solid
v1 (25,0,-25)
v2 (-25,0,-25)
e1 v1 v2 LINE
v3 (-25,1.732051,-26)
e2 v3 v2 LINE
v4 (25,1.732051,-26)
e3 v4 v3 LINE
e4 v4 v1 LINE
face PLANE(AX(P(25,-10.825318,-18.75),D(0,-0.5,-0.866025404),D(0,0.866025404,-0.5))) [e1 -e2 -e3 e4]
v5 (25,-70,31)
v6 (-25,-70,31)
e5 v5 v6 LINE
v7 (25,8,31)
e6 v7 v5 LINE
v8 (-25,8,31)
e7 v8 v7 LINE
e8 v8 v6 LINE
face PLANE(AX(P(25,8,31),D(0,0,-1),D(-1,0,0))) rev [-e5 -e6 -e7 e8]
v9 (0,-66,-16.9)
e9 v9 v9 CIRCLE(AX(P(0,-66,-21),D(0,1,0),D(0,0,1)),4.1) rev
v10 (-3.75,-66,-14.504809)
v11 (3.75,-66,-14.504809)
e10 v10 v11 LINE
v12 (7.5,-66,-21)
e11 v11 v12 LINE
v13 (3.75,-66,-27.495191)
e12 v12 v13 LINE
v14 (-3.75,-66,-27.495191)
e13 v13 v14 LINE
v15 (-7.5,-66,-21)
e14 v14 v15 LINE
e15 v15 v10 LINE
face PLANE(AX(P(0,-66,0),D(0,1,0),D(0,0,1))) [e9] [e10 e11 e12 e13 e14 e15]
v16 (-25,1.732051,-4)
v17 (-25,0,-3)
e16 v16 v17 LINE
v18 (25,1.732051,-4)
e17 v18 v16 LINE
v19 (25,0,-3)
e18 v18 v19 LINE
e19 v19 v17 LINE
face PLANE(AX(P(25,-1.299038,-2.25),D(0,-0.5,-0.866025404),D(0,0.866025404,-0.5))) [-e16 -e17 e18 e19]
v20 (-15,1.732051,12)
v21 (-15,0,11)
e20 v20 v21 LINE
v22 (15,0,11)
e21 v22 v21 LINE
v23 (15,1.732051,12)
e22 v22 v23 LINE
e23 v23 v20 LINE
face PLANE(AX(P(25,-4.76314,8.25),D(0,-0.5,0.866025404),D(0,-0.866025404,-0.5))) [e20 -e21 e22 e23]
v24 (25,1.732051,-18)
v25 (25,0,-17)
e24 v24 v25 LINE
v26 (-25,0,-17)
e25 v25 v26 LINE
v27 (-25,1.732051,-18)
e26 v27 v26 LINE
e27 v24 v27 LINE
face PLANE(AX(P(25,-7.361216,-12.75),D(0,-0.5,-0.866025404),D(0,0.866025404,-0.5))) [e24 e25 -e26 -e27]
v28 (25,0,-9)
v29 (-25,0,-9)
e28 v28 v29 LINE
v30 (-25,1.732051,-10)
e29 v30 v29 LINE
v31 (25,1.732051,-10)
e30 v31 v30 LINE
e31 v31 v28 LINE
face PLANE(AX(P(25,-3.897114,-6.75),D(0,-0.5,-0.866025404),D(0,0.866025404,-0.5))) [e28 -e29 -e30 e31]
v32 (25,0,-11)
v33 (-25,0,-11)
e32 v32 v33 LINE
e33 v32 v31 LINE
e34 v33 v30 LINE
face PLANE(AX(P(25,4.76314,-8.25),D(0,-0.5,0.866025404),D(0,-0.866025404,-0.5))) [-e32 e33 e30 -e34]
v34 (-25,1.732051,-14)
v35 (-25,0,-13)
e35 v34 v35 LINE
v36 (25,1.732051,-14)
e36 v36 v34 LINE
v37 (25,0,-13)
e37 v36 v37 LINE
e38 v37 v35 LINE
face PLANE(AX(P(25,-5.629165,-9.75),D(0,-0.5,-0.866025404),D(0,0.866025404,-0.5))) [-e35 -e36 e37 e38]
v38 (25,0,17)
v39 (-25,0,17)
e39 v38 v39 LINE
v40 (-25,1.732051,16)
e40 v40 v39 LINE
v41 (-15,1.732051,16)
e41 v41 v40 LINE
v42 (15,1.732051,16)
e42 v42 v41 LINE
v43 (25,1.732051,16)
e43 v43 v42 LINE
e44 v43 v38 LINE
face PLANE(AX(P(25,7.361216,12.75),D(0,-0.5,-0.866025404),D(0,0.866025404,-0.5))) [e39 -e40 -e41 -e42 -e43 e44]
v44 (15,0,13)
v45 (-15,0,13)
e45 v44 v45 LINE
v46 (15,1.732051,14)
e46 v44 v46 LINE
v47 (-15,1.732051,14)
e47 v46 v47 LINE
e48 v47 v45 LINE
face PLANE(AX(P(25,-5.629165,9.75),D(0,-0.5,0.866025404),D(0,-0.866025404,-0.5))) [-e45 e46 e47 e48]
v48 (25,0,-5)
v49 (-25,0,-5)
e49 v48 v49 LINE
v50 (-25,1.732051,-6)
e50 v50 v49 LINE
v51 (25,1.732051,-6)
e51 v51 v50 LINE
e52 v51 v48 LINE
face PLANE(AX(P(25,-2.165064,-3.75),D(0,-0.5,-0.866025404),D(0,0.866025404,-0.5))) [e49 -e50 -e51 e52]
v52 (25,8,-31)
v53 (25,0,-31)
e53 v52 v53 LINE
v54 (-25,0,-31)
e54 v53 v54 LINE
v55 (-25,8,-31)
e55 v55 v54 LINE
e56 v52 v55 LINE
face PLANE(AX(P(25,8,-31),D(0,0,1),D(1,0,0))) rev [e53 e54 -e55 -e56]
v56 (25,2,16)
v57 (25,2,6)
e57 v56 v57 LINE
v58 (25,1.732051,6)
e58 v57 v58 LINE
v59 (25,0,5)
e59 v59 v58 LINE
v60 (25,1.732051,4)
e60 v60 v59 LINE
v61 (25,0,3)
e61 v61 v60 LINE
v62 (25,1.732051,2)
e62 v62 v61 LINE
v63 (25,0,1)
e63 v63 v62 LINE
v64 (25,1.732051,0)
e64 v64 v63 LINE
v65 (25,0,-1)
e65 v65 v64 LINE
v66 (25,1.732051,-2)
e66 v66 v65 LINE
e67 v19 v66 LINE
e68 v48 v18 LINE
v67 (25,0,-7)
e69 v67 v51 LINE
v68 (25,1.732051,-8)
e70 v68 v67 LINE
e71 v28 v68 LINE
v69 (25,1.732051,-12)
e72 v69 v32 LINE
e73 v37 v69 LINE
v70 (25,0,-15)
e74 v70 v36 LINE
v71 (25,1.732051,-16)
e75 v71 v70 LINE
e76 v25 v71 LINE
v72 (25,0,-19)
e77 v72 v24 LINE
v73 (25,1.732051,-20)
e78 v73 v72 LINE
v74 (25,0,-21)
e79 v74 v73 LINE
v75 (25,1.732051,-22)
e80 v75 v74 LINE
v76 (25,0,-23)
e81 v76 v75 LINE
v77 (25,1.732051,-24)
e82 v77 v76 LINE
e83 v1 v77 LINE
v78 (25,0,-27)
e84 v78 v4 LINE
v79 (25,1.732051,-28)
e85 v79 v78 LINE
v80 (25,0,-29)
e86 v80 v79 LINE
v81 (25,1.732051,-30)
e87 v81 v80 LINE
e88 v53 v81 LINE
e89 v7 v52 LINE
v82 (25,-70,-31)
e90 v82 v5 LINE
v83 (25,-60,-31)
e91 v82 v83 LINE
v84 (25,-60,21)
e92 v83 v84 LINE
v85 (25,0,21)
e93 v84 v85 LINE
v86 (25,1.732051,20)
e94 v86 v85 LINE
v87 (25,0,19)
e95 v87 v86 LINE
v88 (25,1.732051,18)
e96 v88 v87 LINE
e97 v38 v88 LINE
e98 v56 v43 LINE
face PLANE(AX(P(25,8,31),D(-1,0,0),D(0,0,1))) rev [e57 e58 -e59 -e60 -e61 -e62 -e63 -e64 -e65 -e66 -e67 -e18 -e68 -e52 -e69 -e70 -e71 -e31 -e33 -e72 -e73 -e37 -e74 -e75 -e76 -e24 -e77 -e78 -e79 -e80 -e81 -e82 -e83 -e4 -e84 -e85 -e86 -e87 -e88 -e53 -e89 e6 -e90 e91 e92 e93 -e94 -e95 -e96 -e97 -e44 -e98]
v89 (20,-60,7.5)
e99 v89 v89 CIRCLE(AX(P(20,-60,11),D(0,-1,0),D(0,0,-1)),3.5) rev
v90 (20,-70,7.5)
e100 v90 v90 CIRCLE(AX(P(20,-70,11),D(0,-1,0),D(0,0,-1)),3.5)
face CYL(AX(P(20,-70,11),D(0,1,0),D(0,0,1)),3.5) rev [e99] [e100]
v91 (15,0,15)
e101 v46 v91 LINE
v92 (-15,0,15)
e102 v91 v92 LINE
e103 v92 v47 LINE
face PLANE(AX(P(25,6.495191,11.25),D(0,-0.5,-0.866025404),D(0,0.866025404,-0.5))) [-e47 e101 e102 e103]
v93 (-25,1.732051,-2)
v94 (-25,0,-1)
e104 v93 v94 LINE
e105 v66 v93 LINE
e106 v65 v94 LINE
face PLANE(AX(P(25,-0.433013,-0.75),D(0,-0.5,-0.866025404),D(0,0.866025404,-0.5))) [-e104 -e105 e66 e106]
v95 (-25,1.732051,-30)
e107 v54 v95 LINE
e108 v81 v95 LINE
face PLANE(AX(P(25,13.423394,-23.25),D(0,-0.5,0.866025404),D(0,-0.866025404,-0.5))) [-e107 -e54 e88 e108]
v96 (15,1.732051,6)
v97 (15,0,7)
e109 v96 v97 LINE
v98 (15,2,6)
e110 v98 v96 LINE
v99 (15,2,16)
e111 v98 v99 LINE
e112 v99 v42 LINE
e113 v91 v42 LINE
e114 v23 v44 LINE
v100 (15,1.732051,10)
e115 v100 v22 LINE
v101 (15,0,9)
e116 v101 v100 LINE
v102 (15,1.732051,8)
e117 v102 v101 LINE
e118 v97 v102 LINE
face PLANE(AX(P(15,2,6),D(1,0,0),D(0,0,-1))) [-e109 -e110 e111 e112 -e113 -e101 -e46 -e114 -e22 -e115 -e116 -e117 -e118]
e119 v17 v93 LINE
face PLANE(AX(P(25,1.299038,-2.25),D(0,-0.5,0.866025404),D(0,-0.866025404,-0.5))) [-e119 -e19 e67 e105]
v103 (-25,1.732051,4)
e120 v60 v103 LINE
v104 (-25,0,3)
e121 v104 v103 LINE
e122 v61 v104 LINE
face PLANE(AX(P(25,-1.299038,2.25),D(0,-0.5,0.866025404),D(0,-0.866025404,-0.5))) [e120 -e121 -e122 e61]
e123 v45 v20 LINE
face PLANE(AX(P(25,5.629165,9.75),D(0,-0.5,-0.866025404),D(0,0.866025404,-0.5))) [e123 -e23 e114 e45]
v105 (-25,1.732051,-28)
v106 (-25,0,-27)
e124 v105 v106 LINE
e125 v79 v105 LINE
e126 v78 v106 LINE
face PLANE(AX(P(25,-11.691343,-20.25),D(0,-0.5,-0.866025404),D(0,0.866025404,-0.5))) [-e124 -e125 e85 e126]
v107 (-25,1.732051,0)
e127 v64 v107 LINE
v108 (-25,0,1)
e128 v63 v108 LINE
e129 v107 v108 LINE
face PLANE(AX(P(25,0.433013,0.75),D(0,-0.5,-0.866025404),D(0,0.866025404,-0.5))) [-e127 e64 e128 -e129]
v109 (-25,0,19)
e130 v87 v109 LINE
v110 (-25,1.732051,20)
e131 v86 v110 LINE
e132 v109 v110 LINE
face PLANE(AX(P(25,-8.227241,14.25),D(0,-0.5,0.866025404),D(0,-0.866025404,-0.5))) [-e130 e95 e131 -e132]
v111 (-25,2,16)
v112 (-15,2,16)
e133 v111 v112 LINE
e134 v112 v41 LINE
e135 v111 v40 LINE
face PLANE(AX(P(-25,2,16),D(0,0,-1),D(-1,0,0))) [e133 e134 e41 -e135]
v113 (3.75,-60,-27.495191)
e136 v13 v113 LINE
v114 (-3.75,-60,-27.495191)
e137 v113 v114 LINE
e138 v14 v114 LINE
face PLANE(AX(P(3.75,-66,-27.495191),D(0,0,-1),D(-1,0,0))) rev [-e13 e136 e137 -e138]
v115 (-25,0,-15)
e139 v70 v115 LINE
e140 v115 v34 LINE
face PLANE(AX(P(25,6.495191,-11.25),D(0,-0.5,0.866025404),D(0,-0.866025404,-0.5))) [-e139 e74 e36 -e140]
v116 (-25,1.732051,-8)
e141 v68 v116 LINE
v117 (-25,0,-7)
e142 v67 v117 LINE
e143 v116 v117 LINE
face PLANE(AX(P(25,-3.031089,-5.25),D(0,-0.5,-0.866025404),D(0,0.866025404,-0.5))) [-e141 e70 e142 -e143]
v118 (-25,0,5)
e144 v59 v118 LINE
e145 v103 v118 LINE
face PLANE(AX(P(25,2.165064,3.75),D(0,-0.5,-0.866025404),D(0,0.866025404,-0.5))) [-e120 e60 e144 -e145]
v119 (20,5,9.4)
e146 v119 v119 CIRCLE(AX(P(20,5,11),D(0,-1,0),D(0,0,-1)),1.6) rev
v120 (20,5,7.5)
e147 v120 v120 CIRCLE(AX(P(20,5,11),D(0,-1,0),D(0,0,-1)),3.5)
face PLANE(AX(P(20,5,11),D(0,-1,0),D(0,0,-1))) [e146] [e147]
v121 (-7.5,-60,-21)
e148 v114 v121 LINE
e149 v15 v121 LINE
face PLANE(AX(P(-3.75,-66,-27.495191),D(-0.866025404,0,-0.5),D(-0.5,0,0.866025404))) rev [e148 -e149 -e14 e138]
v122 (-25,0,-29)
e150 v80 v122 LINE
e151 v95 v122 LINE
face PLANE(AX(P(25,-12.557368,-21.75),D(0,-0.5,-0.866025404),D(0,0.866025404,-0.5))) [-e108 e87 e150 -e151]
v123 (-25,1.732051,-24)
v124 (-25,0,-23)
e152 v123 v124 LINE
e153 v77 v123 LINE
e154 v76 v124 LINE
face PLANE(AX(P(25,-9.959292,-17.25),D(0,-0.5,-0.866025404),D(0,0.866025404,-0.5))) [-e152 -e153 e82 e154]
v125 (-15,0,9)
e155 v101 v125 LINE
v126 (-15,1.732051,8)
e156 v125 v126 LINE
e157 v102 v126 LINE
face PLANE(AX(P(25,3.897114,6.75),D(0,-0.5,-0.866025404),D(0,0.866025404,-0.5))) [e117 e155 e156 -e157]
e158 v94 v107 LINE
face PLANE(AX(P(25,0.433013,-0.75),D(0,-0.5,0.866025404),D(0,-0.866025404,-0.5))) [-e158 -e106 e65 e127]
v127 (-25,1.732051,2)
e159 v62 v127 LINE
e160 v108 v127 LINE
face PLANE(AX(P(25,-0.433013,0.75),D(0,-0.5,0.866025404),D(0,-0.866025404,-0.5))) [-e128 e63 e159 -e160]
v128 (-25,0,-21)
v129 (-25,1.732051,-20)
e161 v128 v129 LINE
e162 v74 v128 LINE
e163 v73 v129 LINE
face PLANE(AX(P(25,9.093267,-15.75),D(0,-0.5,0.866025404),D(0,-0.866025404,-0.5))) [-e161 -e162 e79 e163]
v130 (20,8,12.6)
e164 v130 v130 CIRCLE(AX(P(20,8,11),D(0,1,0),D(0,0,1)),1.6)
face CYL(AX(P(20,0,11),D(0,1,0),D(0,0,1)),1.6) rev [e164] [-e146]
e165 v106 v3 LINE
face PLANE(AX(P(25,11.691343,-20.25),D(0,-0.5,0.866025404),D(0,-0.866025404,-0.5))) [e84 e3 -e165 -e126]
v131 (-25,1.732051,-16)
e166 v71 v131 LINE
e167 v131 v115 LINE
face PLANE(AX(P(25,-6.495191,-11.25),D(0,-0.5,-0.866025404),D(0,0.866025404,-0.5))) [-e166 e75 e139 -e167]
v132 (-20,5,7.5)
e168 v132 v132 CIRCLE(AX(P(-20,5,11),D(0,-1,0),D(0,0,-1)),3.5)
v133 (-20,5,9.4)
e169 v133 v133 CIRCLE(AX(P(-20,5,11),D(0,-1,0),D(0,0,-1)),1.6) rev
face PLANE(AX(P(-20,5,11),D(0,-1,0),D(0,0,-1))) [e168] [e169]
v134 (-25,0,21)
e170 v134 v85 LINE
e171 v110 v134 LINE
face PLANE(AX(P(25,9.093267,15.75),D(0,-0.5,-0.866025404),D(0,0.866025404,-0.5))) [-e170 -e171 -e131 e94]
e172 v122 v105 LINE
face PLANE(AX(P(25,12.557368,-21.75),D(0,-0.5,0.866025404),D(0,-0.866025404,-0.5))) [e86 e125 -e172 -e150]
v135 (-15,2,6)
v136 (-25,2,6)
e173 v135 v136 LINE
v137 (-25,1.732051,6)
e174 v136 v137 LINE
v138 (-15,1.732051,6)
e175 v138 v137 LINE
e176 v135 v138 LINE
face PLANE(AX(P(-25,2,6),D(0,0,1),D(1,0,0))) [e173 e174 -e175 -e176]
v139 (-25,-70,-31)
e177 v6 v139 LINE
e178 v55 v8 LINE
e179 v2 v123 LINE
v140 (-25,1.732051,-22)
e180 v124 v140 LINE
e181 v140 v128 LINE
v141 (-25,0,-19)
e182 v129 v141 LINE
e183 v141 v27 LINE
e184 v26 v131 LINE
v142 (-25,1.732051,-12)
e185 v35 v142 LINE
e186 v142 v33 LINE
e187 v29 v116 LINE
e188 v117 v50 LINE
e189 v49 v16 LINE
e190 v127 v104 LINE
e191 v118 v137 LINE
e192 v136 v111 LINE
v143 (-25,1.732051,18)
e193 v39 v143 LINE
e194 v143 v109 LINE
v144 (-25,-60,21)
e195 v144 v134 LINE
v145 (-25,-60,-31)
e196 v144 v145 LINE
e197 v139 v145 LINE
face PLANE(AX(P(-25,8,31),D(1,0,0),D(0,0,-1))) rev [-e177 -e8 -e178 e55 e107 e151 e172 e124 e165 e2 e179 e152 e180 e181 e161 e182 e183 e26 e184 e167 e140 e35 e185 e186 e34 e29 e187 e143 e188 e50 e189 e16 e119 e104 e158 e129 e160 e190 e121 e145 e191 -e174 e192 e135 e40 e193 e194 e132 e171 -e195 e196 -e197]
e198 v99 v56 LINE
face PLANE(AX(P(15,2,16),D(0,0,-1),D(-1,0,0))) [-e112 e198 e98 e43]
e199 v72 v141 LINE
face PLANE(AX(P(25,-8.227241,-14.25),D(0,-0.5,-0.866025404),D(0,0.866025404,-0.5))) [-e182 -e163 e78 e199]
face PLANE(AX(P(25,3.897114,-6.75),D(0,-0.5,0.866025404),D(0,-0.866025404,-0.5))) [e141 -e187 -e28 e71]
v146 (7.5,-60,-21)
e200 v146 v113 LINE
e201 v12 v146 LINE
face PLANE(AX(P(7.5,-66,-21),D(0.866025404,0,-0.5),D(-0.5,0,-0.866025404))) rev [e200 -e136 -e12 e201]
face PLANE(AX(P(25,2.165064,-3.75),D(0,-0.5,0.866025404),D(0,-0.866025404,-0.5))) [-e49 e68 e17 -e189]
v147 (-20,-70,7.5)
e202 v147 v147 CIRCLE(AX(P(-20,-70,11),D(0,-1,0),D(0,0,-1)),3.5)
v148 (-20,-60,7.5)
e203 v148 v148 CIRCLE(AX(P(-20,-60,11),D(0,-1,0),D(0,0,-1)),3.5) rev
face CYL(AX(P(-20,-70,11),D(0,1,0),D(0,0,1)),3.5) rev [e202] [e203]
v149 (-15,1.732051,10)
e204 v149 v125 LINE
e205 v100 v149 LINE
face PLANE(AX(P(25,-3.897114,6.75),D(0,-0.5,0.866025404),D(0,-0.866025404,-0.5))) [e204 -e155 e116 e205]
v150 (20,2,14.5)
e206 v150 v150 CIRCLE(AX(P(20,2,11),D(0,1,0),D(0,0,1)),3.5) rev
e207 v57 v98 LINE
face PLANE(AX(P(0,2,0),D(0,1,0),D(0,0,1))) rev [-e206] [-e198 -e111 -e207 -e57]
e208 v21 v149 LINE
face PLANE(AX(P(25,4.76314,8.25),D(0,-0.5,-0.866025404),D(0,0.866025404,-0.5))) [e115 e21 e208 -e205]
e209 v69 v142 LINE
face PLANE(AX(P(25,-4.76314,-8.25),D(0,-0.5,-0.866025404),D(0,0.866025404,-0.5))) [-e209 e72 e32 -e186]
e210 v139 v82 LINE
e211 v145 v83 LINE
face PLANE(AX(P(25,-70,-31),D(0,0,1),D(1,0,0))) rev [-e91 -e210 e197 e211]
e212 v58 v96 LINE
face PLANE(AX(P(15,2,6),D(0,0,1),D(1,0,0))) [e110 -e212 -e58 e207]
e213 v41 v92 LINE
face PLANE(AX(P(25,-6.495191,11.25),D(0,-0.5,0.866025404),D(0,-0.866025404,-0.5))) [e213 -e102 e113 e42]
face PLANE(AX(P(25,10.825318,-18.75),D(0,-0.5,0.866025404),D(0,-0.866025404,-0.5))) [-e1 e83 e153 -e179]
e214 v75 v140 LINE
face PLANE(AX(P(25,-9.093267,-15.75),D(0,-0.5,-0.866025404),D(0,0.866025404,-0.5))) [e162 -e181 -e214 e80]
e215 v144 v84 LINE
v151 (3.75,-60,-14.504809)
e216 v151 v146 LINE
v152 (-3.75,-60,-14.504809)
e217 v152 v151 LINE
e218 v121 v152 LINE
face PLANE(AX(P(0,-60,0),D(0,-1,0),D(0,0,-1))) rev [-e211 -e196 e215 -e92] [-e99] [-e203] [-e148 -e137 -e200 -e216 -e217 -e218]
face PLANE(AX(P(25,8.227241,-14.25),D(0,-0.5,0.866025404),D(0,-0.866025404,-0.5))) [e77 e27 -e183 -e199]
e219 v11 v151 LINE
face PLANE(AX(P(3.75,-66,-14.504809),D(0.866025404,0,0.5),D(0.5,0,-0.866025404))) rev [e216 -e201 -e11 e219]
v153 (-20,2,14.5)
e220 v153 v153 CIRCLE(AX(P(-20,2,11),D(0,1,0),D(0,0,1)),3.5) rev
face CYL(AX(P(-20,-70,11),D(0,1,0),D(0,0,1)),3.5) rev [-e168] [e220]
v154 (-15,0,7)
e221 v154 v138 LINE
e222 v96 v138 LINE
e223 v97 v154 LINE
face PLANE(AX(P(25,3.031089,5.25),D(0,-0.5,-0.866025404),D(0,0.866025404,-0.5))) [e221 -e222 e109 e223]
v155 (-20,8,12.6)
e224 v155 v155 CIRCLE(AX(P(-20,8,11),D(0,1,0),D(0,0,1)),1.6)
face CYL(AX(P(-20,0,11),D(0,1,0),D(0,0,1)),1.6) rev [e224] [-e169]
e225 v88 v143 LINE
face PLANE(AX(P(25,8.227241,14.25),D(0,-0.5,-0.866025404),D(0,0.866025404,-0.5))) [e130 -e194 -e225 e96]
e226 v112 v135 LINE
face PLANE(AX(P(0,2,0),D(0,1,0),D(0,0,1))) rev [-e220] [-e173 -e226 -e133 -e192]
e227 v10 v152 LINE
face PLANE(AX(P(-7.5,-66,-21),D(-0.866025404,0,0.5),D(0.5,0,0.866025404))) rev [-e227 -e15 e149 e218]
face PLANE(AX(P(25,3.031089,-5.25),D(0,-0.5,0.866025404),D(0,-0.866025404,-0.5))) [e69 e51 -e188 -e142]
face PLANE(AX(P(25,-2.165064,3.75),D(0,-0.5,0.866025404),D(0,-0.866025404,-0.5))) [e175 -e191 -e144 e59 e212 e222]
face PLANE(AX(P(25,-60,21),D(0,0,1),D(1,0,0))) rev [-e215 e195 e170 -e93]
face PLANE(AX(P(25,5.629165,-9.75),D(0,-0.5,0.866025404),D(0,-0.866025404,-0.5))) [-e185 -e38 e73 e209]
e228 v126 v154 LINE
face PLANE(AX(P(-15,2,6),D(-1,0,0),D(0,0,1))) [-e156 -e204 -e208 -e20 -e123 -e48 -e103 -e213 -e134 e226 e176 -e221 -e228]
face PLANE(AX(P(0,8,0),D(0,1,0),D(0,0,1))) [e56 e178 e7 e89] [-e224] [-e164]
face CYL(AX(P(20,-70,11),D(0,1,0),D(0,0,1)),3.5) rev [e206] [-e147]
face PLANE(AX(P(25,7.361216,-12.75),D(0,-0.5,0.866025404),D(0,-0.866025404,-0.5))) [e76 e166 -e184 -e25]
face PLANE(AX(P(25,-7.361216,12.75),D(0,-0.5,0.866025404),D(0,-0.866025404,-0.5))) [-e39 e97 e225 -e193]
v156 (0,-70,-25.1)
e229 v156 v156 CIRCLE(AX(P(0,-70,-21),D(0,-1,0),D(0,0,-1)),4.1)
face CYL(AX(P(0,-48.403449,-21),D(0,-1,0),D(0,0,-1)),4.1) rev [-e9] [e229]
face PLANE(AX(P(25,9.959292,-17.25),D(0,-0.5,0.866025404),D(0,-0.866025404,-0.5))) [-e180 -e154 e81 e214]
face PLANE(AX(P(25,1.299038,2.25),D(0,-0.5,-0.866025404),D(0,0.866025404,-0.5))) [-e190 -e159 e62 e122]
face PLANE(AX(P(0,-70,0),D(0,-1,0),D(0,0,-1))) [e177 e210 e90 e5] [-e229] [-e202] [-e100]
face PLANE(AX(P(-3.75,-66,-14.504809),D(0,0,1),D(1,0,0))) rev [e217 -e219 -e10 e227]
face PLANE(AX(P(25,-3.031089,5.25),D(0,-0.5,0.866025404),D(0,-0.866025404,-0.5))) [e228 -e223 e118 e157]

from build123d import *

# Parameters (mm, degrees)
SKETCH1_W               = 50
SKETCH1_H               = 62
BOSS_EXTRUDE1_DEPTH     = 8
SKETCH2_R               = 1.6
CUT_EXTRUDE1_DEPTH      = 41.620192023
SKETCH4_W               = 50
SKETCH4_H               = 10
BOSS_EXTRUDE2_DEPTH     = 60
SKETCH5_W               = 50
SKETCH5_H               = 62
BOSS_EXTRUDE3_DEPTH     = 10
SKETCH6_R               = 4.1
CUT_EXTRUDE3_DEPTH      = 10
CUT_EXTRUDE4_START      = -50
CUT_EXTRUDE4_DEPTH      = 50
CUT_EXTRUDE6_DEPTH      = 6
CUT_EXTRUDE7_START      = -8
SKETCH10_W              = 10
SKETCH10_H              = 10
CUT_EXTRUDE7_DEPTH      = 2
CUT_EXTRUDE8_DEPTH      = 83.280009723
CUT_EXTRUDE8_DEPTH_BACK = 3
SKETCH11_R              = 3.5


# Read off the part's stored shape, not the designer's step: Cut-Extrude4
with BuildPart() as part:
    # Sketch1 → Boss-Extrude1 (new body)
    with BuildSketch(Plane(origin=(0, 0, 0), x_dir=(1, 0, 0), z_dir=(0, 1, 0))):
        Rectangle(SKETCH1_W, SKETCH1_H)
    extrude(amount=BOSS_EXTRUDE1_DEPTH)

    # Sketch2 → Cut-Extrude1 (cut, through all)
    with BuildSketch(Plane(origin=(0, 8, 0), x_dir=(1, 0, 0), z_dir=(0, 1, 0))):
        with Locations(Location((-20, -11, 0), (0, 0, 270))):
            Circle(SKETCH2_R)
        with Locations(Location((20, -11, 0), (0, 0, 270))):
            Circle(SKETCH2_R)
    extrude(amount=-CUT_EXTRUDE1_DEPTH, mode=Mode.SUBTRACT)

    # Sketch4 → Boss-Extrude2 (add)
    with BuildSketch(Plane.XZ):
        with Locations((0, 26)):
            Rectangle(SKETCH4_W, SKETCH4_H)
    extrude(amount=BOSS_EXTRUDE2_DEPTH)

    # Sketch5 → Boss-Extrude3 (add)
    with BuildSketch(Plane.XZ.offset(60)):
        Rectangle(SKETCH5_W, SKETCH5_H)
    extrude(amount=BOSS_EXTRUDE3_DEPTH)

    # Sketch6 → Cut-Extrude3 (cut)
    with BuildSketch(Plane.XZ.offset(70)):
        with Locations(Location((0, -21, 0), (0, 0, 270))):
            Circle(SKETCH6_R)
    extrude(amount=-CUT_EXTRUDE3_DEPTH, mode=Mode.SUBTRACT)

    # Cut-Extrude4 outline → Cut-Extrude4 (cut)
    with BuildSketch(Plane.ZY.offset(25).offset(CUT_EXTRUDE4_START)):
        Polygon((20, 1.732050808), (19, 0), (21, 0), align=None)
        Polygon((18, 1.732050808), (17, 0), (19, 0), align=None)
        Polygon((16, 1.732050808), (15, 0), (17, 0), align=None)
        Polygon((14, 1.732050808), (13, 0), (15, 0), align=None)
        Polygon((-31, 0), (-29, 0), (-30, 1.732050808), align=None)
        Polygon((-29, 0), (-27, 0), (-28, 1.732050808), align=None)
        Polygon((-27, 0), (-25, 0), (-26, 1.732050808), align=None)
        Polygon((-25, 0), (-23, 0), (-24, 1.732050808), align=None)
        Polygon((-23, 0), (-21, 0), (-22, 1.732050808), align=None)
        Polygon((-21, 0), (-19, 0), (-20, 1.732050808), align=None)
        Polygon((-19, 0), (-17, 0), (-18, 1.732050808), align=None)
        Polygon((-17, 0), (-15, 0), (-16, 1.732050808), align=None)
        Polygon((-15, 0), (-13, 0), (-14, 1.732050808), align=None)
        Polygon((-13, 0), (-11, 0), (-12, 1.732050808), align=None)
        Polygon((-11, 0), (-9, 0), (-10, 1.732050808), align=None)
        Polygon((-9, 0), (-7, 0), (-8, 1.732050808), align=None)
        Polygon((-7, 0), (-5, 0), (-6, 1.732050808), align=None)
        Polygon((-5, 0), (-3, 0), (-4, 1.732050808), align=None)
        Polygon((-3, 0), (-1, 0), (-2, 1.732050808), align=None)
        Polygon((-1, 0), (1, 0), (0, 1.732050808), align=None)
        Polygon((1, 0), (3, 0), (2, 1.732050808), align=None)
        Polygon((3, 0), (5, 0), (4, 1.732050808), align=None)
        Polygon((5, 0), (7, 0), (6, 1.732050808), align=None)
        Polygon((7, 0), (9, 0), (8, 1.732050808), align=None)
        Polygon((9, 0), (11, 0), (10, 1.732050808), align=None)
        Polygon((13, 0), (12, 1.732050808), (11, 0), align=None)
    extrude(amount=CUT_EXTRUDE4_DEPTH, mode=Mode.SUBTRACT)

    # Sketch9 → Cut-Extrude6 (cut)
    with BuildSketch(Plane(origin=(0, -60, 0), x_dir=(1, 0, 0), z_dir=(0, 1, 0))):
        Polygon((3.75, 14.504809472), (7.5, 21), (3.75, 27.495190528), (-3.75, 27.495190528), (-7.5, 21), (-3.75, 14.504809472), align=None)
    extrude(amount=-CUT_EXTRUDE6_DEPTH, mode=Mode.SUBTRACT)

    # Sketch10 → Cut-Extrude7 (cut)
    with BuildSketch(Plane(origin=(0, 8, 0), x_dir=(1, 0, 0), z_dir=(0, 1, 0)).offset(CUT_EXTRUDE7_START)):
        with Locations((20, -11)):
            Rectangle(SKETCH10_W, SKETCH10_H)
        with Locations((-20, -11)):
            Rectangle(SKETCH10_W, SKETCH10_H)
    extrude(amount=CUT_EXTRUDE7_DEPTH, mode=Mode.SUBTRACT)

    # Sketch11 → Cut-Extrude8 (cut, two sides: drawn at the far end of the back side and taken through both)
    with BuildSketch(Plane.XZ.offset(-2).offset(-CUT_EXTRUDE8_DEPTH_BACK)):
        with Locations(Location((-20, 11, 0), (0, 0, 90))):
            Circle(SKETCH11_R)
        with Locations(Location((20, 11, 0), (0, 0, 90))):
            Circle(SKETCH11_R)
    extrude(amount=CUT_EXTRUDE8_DEPTH + CUT_EXTRUDE8_DEPTH_BACK, mode=Mode.SUBTRACT)


solid = part.part
